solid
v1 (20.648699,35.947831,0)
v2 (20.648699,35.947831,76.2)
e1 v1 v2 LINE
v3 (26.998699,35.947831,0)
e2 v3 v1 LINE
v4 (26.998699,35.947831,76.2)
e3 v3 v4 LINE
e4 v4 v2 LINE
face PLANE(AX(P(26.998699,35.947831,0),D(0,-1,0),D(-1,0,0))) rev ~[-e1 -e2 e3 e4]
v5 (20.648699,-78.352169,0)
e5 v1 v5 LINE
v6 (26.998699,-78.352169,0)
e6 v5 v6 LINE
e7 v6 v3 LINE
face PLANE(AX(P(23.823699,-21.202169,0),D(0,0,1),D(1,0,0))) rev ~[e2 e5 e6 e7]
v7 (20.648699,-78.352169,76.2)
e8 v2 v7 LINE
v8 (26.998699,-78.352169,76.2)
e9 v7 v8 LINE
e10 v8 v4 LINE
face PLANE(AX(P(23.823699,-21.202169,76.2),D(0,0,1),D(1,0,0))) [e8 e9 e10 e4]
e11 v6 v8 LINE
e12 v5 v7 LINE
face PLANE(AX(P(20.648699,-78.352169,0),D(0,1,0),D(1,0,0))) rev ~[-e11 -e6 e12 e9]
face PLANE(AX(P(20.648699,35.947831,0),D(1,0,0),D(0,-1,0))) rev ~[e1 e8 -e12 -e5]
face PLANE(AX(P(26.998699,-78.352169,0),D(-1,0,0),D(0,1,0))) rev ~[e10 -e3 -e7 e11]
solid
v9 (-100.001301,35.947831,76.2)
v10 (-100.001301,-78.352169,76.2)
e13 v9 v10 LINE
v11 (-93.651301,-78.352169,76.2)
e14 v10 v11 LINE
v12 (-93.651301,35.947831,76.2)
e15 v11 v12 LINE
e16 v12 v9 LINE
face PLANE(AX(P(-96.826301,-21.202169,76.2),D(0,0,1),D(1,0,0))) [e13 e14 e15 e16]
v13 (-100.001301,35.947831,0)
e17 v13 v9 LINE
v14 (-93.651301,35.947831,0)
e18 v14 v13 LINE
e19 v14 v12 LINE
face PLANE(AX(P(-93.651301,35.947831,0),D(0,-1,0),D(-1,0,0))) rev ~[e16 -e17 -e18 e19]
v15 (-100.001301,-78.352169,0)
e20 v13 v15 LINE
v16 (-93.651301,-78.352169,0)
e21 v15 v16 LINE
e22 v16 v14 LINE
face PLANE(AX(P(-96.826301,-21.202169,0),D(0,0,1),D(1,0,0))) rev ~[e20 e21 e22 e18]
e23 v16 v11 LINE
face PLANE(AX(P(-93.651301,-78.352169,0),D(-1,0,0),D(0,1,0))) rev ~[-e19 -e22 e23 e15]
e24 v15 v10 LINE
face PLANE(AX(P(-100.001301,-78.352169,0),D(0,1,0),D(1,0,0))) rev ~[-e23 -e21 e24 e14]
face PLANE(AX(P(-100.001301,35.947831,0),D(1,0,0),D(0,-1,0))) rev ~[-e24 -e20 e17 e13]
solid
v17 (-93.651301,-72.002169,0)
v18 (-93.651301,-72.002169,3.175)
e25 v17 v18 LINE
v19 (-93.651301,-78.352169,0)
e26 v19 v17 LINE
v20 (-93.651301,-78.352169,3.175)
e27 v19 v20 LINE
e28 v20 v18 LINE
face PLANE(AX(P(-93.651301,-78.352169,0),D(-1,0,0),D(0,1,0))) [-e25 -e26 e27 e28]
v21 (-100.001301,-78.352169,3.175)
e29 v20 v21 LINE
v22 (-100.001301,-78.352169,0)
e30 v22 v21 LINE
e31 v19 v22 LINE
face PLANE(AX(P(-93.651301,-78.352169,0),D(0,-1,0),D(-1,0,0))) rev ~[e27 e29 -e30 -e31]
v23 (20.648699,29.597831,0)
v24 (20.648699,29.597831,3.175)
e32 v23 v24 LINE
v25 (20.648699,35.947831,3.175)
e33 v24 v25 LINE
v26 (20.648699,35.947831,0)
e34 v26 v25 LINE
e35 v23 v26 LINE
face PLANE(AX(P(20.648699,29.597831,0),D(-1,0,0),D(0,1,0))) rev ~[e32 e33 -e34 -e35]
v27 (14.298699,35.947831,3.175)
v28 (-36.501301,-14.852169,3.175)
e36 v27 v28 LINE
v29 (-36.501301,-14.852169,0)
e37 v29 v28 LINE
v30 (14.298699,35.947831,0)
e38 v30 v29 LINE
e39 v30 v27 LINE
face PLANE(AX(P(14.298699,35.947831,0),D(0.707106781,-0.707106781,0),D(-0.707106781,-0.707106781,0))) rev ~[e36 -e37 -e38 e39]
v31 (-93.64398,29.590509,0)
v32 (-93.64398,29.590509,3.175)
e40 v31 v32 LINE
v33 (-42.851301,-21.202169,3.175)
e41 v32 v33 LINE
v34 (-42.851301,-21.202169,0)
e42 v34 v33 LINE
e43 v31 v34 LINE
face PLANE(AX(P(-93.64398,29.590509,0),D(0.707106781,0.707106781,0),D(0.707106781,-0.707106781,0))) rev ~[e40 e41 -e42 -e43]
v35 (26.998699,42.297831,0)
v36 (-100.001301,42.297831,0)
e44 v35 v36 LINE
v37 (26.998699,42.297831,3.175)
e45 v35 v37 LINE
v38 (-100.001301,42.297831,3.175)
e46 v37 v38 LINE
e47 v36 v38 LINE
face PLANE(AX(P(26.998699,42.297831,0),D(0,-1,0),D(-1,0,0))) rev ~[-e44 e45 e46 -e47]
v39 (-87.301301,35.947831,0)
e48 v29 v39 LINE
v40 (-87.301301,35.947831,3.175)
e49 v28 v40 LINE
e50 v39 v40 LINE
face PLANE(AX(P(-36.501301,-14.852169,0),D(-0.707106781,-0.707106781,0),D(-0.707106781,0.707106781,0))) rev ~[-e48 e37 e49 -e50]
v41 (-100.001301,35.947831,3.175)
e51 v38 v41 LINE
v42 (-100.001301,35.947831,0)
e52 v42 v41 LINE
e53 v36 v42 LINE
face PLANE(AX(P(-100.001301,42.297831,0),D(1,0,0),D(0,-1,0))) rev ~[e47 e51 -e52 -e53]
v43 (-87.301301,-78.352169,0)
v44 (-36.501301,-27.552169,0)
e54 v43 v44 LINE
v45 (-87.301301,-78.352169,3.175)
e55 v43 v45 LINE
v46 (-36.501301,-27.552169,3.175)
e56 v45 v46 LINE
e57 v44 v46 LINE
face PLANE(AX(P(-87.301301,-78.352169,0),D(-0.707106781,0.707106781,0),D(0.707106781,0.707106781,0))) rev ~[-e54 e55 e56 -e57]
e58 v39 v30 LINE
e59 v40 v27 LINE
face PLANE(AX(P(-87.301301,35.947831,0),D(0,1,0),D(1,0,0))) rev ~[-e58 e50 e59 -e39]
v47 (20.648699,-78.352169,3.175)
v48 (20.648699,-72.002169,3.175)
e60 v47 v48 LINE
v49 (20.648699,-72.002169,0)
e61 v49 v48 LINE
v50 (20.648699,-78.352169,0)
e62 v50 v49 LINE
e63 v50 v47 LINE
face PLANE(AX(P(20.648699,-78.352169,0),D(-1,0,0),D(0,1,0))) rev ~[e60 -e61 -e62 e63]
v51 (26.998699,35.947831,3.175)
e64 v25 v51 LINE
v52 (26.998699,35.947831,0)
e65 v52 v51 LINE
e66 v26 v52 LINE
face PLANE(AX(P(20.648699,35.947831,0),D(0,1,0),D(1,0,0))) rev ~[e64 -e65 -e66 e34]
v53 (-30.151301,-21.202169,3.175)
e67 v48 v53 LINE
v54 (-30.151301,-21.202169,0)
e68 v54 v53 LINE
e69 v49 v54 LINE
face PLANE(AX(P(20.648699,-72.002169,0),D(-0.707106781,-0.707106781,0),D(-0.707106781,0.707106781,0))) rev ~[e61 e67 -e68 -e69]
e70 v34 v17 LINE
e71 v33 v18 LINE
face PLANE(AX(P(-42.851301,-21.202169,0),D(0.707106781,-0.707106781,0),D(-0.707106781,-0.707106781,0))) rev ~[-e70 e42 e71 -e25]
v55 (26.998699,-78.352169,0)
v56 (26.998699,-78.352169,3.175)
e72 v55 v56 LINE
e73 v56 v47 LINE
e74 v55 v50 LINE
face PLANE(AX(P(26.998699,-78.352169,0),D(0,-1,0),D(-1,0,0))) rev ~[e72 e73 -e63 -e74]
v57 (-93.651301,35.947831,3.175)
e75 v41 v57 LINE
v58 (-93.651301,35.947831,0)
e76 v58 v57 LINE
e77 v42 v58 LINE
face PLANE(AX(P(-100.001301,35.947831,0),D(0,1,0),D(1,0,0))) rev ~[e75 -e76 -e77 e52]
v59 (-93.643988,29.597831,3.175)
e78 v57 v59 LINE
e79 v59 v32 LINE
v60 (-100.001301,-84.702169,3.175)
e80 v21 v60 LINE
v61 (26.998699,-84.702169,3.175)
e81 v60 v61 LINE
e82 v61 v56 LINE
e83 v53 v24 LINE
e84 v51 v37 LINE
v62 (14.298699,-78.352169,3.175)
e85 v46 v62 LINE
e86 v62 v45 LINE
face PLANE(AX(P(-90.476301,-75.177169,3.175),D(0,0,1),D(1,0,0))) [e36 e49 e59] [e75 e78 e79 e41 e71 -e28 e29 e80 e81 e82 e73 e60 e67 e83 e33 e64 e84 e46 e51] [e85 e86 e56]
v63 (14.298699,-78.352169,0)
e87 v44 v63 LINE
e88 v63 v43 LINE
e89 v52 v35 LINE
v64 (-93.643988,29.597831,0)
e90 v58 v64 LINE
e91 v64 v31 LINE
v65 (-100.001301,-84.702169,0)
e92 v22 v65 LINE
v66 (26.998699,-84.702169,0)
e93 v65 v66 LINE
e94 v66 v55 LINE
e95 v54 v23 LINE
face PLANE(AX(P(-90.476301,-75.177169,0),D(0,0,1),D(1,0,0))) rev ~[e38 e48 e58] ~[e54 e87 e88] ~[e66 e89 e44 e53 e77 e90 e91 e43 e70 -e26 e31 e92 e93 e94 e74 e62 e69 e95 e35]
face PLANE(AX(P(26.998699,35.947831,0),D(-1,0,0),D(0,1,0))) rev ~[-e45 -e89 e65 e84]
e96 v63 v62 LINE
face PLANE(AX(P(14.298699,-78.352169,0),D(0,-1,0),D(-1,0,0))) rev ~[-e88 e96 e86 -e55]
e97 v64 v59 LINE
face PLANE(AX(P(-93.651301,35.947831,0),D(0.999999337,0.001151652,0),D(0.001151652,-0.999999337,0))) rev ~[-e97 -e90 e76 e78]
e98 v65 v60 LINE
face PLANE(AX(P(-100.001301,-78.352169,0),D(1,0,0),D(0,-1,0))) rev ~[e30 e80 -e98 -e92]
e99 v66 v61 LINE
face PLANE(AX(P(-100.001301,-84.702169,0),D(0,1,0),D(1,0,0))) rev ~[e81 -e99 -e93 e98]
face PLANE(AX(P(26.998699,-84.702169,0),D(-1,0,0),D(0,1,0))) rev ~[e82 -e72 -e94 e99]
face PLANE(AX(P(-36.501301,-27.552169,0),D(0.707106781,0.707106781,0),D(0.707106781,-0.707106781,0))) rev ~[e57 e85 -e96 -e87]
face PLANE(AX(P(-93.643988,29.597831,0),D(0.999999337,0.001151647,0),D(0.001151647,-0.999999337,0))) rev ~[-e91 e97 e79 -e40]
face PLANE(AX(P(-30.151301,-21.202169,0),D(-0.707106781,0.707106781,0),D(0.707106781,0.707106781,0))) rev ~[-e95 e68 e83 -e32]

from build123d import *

# Parameters (mm, degrees)
F0_W     = 6.35
F0_H     = 6.35
F1_DEPTH = 3.175
F2_DEPTH = 76.2
F3_DEPTH = 76.2


with BuildPart() as f1:
    # F0 (on Top) → F1 (new body)
    with BuildSketch(Plane.XY):
        with Locations((-90.4763010761, -75.1771691605)):
            Rectangle(F0_W, F0_H)
        Polygon((-42.8513010761, -21.2021691605), (-93.6513010761, -72.0021691605), (-87.3013010761, -72.0021691605), (-87.3013010761, -78.3521691605), (-36.5013010761, -27.5521691605), align=None)
        Polygon((20.6486989239, -72.0021691605), (-30.1513010761, -21.2021691605), (-36.5013010761, -27.5521691605), (14.2986989239, -78.3521691605), (14.2986989239, -72.0021691605), align=None)
        Polygon((-36.5013010761, -14.8521691605), (-87.3013010761, 35.9478308395), (-87.3013010761, 29.5978308395), (-93.6439880831, 29.5978308395), (-93.6439796514, 29.5905094148), (-42.8513010761, -21.2021691605), align=None)
        Polygon((14.2986989239, 29.5978308395), (14.2986989239, 35.9478308395), (-36.5013010761, -14.8521691605), (-30.1513010761, -21.2021691605), (20.6486989239, 29.5978308395), align=None)
        with Locations((17.4736989239, 32.7728308395)):
            Rectangle(F0_W, F0_H)
        Polygon((-30.1513010761, -21.2021691605), (-36.5013010761, -14.8521691605), (-42.8513010761, -21.2021691605), (-36.5013010761, -27.5521691605), align=None)
        Polygon((-87.3013010761, 35.9478308395), (-93.6513010761, 35.9478308395), (-93.6439880831, 29.5978308395), (-87.3013010761, 29.5978308395), align=None)
        with Locations((17.4736989239, -75.1771691605)):
            Rectangle(F0_W, F0_H)
        Polygon((-100.0013010761, 35.9478308395), (-93.6513010761, 35.9478308395), (-87.3013010761, 35.9478308395), (14.2986989239, 35.9478308395), (20.6486989239, 35.9478308395), (26.9986989239, 35.9478308395), (26.9986989239, 42.2978308395), (-100.0013010761, 42.2978308395), align=None)
        Polygon((-93.6513010761, -78.3521691605), (-100.0013010761, -78.3521691605), (-100.0013010761, -84.7021691605), (26.9986989239, -84.7021691605), (26.9986989239, -78.3521691605), (20.6486989239, -78.3521691605), (14.2986989239, -78.3521691605), (4.1404153609, -78.3521691605), (-87.3013010761, -78.3521691605), align=None)
    extrude(amount=F1_DEPTH)


with BuildPart() as f2:
    # F0 (on Top) → F2 (new body)
    with BuildSketch(Plane.XY):
        Polygon((-93.6513010761, 29.5978308395), (-93.6513010761, 35.9478308395), (-100.0013010761, 35.9478308395), (-100.0013010761, -78.3521691605), (-93.6513010761, -78.3521691605), (-93.6513010761, -72.0021691605), align=None)
    extrude(amount=F2_DEPTH)


with BuildPart() as f3:
    # F0 (on Top) → F3 (new body)
    with BuildSketch(Plane.XY):
        Polygon((26.9986989239, 35.9478308395), (20.6486989239, 35.9478308395), (20.6486989239, 29.5978308395), (20.6486989239, -72.0021691605), (20.6486989239, -78.3521691605), (26.9986989239, -78.3521691605), align=None)
    extrude(amount=F3_DEPTH)


solid = Compound([f1.part, f2.part, f3.part])
